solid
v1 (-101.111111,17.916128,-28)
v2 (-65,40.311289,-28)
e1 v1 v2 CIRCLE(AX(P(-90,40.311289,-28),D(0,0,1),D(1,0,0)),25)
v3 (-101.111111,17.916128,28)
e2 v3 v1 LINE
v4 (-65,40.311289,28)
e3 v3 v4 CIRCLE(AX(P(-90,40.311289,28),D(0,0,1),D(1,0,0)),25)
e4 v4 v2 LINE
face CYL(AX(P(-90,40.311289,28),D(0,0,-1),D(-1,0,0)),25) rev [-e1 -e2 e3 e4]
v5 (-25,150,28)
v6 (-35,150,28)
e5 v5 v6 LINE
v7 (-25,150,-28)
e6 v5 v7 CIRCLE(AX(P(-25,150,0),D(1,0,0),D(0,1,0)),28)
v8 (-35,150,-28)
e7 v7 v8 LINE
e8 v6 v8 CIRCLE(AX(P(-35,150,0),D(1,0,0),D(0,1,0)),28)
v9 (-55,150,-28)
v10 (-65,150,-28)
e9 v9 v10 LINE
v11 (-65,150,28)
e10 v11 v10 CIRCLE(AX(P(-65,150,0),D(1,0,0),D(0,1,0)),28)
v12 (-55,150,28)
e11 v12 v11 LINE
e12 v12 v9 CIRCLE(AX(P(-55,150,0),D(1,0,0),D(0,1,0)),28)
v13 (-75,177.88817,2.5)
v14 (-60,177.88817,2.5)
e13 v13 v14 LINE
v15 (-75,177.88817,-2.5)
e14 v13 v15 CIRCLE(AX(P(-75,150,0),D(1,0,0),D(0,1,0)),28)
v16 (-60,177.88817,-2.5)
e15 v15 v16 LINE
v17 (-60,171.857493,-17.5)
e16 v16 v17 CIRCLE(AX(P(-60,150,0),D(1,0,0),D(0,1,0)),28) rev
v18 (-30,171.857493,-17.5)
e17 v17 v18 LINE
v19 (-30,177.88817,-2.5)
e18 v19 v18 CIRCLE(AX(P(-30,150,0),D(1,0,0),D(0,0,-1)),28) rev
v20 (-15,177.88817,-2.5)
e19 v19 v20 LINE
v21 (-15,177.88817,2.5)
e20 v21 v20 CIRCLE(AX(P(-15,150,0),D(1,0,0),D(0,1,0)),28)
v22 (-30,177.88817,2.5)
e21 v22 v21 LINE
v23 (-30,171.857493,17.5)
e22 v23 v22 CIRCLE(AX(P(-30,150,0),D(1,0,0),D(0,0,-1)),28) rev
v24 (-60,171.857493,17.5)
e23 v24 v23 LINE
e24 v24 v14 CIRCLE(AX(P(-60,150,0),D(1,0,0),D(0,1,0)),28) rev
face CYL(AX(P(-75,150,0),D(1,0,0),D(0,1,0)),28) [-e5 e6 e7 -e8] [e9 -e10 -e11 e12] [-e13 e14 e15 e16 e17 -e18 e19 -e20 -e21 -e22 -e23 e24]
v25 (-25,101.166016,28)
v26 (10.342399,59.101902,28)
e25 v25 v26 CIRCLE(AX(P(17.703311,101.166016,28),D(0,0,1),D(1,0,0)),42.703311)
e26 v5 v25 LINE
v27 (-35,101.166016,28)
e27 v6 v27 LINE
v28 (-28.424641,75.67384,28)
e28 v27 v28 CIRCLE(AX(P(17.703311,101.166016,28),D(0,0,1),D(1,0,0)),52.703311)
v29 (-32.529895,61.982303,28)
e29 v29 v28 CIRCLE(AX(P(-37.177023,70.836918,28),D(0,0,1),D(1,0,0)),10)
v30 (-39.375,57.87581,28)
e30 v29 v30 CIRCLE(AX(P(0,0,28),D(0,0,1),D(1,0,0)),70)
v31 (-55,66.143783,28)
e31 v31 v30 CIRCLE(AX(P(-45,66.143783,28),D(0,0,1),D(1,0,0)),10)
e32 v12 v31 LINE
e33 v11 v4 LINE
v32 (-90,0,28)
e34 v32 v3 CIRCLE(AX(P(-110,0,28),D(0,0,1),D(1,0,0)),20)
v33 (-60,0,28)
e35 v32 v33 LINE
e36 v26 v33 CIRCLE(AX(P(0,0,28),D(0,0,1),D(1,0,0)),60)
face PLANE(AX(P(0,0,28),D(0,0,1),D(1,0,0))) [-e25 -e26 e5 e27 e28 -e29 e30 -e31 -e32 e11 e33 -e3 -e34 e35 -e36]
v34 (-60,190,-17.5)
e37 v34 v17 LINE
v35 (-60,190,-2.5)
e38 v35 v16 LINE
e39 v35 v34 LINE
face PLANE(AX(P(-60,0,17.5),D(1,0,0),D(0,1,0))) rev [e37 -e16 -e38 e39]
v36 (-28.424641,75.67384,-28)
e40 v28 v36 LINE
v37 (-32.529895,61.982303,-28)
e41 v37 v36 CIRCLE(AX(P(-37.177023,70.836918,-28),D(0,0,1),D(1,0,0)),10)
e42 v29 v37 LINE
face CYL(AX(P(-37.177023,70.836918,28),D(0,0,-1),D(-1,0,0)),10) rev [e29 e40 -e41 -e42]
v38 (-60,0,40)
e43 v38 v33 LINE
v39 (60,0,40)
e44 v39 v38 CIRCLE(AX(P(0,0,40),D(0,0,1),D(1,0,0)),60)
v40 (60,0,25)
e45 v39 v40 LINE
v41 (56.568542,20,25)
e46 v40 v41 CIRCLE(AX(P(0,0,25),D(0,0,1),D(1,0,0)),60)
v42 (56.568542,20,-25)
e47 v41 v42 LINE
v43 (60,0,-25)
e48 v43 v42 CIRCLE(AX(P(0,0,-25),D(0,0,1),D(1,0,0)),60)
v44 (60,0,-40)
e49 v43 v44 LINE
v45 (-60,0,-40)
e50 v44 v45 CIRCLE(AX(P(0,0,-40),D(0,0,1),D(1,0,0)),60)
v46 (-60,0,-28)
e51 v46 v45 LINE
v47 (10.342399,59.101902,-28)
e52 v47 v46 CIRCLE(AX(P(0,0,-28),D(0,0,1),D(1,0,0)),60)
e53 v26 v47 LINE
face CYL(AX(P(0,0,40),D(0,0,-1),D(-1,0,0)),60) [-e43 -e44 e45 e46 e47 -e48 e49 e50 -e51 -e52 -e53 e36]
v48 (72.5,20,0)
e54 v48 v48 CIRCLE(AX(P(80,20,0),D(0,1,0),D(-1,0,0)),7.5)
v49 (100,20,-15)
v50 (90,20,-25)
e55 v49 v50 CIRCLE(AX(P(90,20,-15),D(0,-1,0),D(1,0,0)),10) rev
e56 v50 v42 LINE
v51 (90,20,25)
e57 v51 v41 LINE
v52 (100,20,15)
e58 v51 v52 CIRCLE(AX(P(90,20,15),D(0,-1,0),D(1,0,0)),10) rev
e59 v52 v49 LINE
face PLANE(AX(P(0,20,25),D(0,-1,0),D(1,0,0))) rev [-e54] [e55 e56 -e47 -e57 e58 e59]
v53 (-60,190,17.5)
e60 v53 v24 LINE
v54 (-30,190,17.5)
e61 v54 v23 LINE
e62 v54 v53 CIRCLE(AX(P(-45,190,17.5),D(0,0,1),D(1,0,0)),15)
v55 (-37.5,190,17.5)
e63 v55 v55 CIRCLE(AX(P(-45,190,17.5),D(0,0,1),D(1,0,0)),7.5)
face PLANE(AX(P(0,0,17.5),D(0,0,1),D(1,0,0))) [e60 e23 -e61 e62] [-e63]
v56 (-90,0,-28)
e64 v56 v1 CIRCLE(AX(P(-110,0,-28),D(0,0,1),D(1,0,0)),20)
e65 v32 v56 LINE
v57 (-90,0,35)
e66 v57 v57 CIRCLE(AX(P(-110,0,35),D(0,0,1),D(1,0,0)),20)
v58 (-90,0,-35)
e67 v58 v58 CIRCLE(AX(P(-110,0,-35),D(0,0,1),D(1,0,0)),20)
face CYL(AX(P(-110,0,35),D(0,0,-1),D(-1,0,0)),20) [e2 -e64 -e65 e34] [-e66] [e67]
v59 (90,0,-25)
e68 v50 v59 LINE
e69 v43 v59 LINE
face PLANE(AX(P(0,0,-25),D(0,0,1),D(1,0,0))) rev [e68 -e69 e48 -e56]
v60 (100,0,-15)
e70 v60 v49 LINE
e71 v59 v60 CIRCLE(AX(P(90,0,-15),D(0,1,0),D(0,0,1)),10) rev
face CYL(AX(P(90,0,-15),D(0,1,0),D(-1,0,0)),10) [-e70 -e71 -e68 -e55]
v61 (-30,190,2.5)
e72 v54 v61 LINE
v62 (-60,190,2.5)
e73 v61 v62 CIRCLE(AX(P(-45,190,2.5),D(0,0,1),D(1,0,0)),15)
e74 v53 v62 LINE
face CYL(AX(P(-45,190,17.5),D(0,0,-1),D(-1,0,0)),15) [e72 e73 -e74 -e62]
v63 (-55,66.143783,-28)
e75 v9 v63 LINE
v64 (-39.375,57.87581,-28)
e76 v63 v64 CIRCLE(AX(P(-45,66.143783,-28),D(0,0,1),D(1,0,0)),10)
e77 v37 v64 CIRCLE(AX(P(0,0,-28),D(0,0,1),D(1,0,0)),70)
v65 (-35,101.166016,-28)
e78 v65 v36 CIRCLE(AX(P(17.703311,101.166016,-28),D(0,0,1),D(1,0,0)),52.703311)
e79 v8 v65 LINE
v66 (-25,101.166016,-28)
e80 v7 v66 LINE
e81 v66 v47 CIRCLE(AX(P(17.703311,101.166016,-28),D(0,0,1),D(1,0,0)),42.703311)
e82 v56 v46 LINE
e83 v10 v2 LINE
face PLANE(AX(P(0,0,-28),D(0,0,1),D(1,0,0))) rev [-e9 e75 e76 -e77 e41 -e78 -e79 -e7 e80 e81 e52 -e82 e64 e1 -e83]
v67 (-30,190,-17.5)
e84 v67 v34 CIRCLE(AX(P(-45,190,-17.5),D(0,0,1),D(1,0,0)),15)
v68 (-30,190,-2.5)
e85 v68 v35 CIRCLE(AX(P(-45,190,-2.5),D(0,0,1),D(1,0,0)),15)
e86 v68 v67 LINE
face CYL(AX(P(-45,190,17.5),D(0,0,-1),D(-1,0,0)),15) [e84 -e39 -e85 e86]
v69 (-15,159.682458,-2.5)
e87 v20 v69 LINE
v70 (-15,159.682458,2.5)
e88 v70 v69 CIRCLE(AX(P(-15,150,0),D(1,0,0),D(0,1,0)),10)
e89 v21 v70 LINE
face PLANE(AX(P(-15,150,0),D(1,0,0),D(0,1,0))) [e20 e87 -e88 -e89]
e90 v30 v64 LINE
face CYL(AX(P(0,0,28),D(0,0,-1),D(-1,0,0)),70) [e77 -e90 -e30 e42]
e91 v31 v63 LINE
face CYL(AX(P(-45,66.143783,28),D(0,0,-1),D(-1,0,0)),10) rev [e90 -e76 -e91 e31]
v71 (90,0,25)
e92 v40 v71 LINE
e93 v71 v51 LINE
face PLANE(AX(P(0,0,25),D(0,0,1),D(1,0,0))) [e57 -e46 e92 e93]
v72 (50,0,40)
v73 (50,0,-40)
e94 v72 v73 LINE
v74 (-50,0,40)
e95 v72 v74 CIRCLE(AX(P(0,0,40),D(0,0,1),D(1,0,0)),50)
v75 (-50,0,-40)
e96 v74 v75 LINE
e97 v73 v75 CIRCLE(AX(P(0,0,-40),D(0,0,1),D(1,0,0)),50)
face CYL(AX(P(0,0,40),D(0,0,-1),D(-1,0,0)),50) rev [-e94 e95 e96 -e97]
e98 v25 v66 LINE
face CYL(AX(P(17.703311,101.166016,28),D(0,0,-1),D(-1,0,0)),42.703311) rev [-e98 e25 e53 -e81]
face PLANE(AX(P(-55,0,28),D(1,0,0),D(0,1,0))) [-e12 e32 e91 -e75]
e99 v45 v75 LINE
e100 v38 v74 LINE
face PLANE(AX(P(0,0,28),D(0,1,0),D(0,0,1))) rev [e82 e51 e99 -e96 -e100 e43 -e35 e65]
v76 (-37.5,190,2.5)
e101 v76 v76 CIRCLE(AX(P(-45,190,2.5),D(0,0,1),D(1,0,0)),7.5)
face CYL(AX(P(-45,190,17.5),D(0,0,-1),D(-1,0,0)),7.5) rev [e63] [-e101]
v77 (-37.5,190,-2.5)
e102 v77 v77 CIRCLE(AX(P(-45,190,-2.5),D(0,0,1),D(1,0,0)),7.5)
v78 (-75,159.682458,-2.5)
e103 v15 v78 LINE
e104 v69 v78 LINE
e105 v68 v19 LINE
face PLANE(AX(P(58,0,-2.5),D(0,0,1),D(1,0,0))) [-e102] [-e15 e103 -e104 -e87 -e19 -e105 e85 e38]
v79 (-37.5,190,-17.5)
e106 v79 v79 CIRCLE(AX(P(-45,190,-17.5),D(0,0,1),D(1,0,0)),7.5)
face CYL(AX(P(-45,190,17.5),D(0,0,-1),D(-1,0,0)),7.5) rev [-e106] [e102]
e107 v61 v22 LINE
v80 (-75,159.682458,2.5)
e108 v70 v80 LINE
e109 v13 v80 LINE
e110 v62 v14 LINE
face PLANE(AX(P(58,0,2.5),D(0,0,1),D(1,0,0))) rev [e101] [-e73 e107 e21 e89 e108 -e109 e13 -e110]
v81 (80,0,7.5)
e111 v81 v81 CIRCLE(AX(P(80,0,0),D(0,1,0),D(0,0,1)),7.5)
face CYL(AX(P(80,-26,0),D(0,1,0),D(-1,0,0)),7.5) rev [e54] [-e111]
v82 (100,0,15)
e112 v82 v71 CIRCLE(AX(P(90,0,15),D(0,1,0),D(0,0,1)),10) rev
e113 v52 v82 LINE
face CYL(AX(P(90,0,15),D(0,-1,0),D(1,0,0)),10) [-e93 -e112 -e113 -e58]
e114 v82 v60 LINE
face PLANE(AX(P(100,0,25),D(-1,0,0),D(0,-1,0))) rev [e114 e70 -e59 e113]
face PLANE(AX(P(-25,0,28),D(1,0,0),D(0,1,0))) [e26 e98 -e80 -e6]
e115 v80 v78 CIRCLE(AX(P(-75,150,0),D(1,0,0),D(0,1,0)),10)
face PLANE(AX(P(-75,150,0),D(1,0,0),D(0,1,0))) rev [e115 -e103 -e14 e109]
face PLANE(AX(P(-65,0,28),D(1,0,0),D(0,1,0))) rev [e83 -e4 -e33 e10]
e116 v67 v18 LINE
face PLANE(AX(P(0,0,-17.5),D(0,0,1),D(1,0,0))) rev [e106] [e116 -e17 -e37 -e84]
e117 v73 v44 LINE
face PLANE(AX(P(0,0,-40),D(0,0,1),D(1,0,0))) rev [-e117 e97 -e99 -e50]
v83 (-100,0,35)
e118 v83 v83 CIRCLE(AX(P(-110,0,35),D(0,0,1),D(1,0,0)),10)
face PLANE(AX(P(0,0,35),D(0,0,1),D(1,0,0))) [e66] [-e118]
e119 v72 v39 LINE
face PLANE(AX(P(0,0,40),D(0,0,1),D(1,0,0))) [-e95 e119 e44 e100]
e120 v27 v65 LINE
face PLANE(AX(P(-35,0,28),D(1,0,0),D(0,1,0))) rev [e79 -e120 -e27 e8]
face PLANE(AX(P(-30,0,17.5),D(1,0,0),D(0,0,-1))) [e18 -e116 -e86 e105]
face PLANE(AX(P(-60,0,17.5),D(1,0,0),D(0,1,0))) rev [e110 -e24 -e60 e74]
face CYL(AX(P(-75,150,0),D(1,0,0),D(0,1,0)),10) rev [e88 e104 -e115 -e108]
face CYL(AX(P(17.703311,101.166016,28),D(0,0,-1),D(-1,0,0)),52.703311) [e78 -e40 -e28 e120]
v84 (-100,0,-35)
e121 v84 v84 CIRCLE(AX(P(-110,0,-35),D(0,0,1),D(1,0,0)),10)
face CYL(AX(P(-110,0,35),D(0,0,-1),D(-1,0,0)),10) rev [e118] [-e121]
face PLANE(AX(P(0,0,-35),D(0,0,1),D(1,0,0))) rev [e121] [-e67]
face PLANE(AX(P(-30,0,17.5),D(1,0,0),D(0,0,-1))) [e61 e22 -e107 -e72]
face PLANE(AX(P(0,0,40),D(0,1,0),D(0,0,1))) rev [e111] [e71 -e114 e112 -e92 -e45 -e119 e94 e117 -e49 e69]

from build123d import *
from build123d.topology import SkipClean

# Parameters (mm, degrees)
BOSS_EXTRUDE1_START       = -35
BOSS_EXTRUDE1_OUTLINE_R   = 20
BOSS_EXTRUDE1_OUTLINE_R_2 = 10
BOSS_EXTRUDE1_DEPTH       = 70
BOSS_EXTRUDE2_DEPTH       = 40
SKETCH1_7_W               = 20
SKETCH1_7_H               = 20
BOSS_EXTRUDE3_DEPTH       = 25
BOSS_EXTRUDE4_DEPTH       = 28
SKETCH4_R                 = 28
SKETCH4_R_2               = 10
BOSS_EXTRUDE5_DEPTH       = 60
BOSS_EXTRUDE7_START       = -17.5
BOSS_EXTRUDE7_OUTLINE_R   = 7.5
BOSS_EXTRUDE7_DEPTH       = 35
BOSS_EXTRUDE6_DEPTH       = 28
CUT_EXTRUDE3_DEPTH        = 83
CUT_EXTRUDE3_DEPTH_BACK   = 100
SKETCH8_R                 = 7.5
CUT_EXTRUDE4_DEPTH        = 46
FILLET1_R                 = 10


# Read off the part's stored shape, not the designer's step: Boss-Extrude1, Boss-Extrude7
with BuildPart() as part:
    # Boss-Extrude1 outline → Boss-Extrude1 (new body)
    with BuildSketch(Plane.XY.offset(BOSS_EXTRUDE1_START)):
        with Locations((-110, 0)):
            Circle(BOSS_EXTRUDE1_OUTLINE_R)
        with Locations((-110, 0)):
            Circle(BOSS_EXTRUDE1_OUTLINE_R_2, mode=Mode.SUBTRACT)
    extrude(amount=BOSS_EXTRUDE1_DEPTH)



with BuildPart() as body_2:
    # Sketch1<6> → Boss-Extrude2 (new, symmetric)
    with BuildSketch(Plane.XY):
        with BuildLine():
            ThreePointArc((-50, 0), (0, 50), (50, 0))
            Line((50, 0), (60, 0))
            ThreePointArc((60, 0), (59.135913579, 10.146118724), (56.568542495, 20))
            ThreePointArc((56.568542495, 20), (38.749299446, 45.8092981), (10.342399193, 59.101901652))
            ThreePointArc((10.342399193, 59.101901652), (-38.596995015, 45.937696675), (-60, 0))
            Line((-60, 0), (-50, 0))
        make_face()
    extrude(amount=BOSS_EXTRUDE2_DEPTH, both=True)

    # Sketch1<7> → Boss-Extrude3 (add, symmetric)
    with BuildSketch(Plane.XY):
        with BuildLine():
            ThreePointArc((56.568542495, 20), (59.135913579, 10.146118724), (60, 0))
            Line((60, 0), (80, 0))
            Line((80, 0), (80, 20))
            Line((80, 20), (56.568542495, 20))
        make_face()
        with Locations((90, 10)):
            Rectangle(SKETCH1_7_W, SKETCH1_7_H)
    extrude(amount=BOSS_EXTRUDE3_DEPTH, both=True)


with BuildPart() as part_1:
    add(part.part)

    add(body_2.part)  # Boss-Extrude4 merges body 2
    # Sketch1<10> → Boss-Extrude4 (add, symmetric)
    with BuildSketch(Plane.XY):
        with BuildLine():
            Line((-90, 0), (-70, 0))
            ThreePointArc((-70, 0), (-68.738635424, 13.228756555), (-65, 25.980762114))
            Line((-65, 25.980762114), (-65, 40.311288741))
            ThreePointArc((-65, 40.311288741), (-76.823843083, 19.065374102), (-101.111111111, 17.91612833))
            ThreePointArc((-101.111111111, 17.91612833), (-93.003268288, 10.540925534), (-90, 0))
        make_face()
        with BuildLine():
            Line((-70, 0), (-60, 0))
            ThreePointArc((-60, 0), (-38.596995015, 45.937696675), (10.342399193, 59.101901652))
            ThreePointArc((10.342399193, 59.101901652), (-0.830275834, 62.694222351), (-10.603119378, 69.192296244))
            ThreePointArc((-10.603119378, 69.192296244), (-21.865731835, 66.497291458), (-32.529894875, 61.982303438))
            ThreePointArc((-32.529894875, 61.982303438), (-36.01103024, 60.026708231), (-39.375, 57.87580993))
            ThreePointArc((-39.375, 57.87580993), (-54.569759712, 43.842232208), (-65, 25.980762114))
            ThreePointArc((-65, 25.980762114), (-68.738635424, 13.228756555), (-70, 0))
        make_face()
        with BuildLine():
            Line((-65, 40.311288741), (-65, 25.980762114))
            ThreePointArc((-65, 25.980762114), (-54.569759712, 43.842232208), (-39.375, 57.87580993))
            ThreePointArc((-39.375, 57.87580993), (-49.677071733, 57.304948012), (-55, 66.143782777))
            Line((-55, 66.143782777), (-55, 136))
            Line((-55, 136), (-65, 136))
            Line((-65, 136), (-65, 40.311288741))
        make_face()
        with BuildLine():
            ThreePointArc((-32.529894875, 61.982303438), (-21.865731835, 66.497291458), (-10.603119378, 69.192296244))
            ThreePointArc((-10.603119378, 69.192296244), (-21.234787758, 83.633268621), (-25, 101.166016053))
            Line((-25, 101.166016053), (-25, 136))
            Line((-25, 136), (-35, 136))
            Line((-35, 136), (-35, 101.166016053))
            ThreePointArc((-35, 101.166016053), (-33.329691901, 88.00274883), (-28.424640616, 75.67383951))
            ThreePointArc((-28.424640616, 75.67383951), (-27.598335088, 67.964855653), (-32.529894875, 61.982303438))
        make_face()
    extrude(amount=BOSS_EXTRUDE4_DEPTH, both=True)



with BuildPart() as body_2_2:
    # Sketch4 → Boss-Extrude5 (new body)
    with BuildSketch(Plane(origin=(-15, 0, 0), x_dir=(0, 0, -1), z_dir=(1, 0, 0))):
        with Locations(Location((0, 150, 0), (0, 0, 90))):
            Circle(SKETCH4_R)
        with Locations(Location((0, 150, 0), (0, 0, 90))):
            Circle(SKETCH4_R_2, mode=Mode.SUBTRACT)
    extrude(amount=-BOSS_EXTRUDE5_DEPTH)

    # Boss-Extrude7 outline → Boss-Extrude7 (add)
    with BuildSketch(Plane.XY.offset(BOSS_EXTRUDE7_START)):
        with BuildLine():
            Line((-30, 150), (-30, 190))
            ThreePointArc((-30, 190), (-45, 205), (-60, 190))
            Line((-60, 190), (-60, 150))
            Line((-60, 150), (-30, 150))
        make_face()
        with Locations((-45, 190)):
            Circle(BOSS_EXTRUDE7_OUTLINE_R, mode=Mode.SUBTRACT)
    extrude(amount=BOSS_EXTRUDE7_DEPTH)


with BuildPart() as part_2:
    add(part_1.part)

    add(body_2_2.part)  # Boss-Extrude6 merges body 2 2
    # Sketch1<11> → Boss-Extrude6 (add, symmetric)
    with BuildSketch(Plane.XY):
        Polygon((-35, 136), (-25, 136), (-25, 150), (-30, 150), (-35, 150), align=None)
        Polygon((-65, 150), (-65, 136), (-55, 136), (-55, 150), (-60, 150), align=None)
    extrude(amount=BOSS_EXTRUDE6_DEPTH, both=True)

    # Sketch7 → Cut-Extrude3 (cut, two sides: drawn at the far end of the back side and taken through both)
    with SkipClean():  # the faces are left unmerged after this step: merging them gives an invalid solid
        with BuildSketch(Plane(origin=(-25, 0, 0), x_dir=(0, 0, -1), z_dir=(1, 0, 0)).offset(-CUT_EXTRUDE3_DEPTH_BACK)):
            with BuildLine():
                ThreePointArc((2.5, 159.682458366), (1.260042925, 159.920296963), (0, 160))
                ThreePointArc((0, 160), (-1.260042925, 159.920296963), (-2.5, 159.682458366))
                ThreePointArc((-2.5, 159.682458366), (-7.90569415, 156.123724357), (-10, 150))
                Line((-10, 150), (10, 150))
                ThreePointArc((10, 150), (7.90569415, 156.123724357), (2.5, 159.682458366))
            make_face()
            with BuildLine():
                ThreePointArc((-10, 150), (0, 140), (10, 150))
                Line((10, 150), (-10, 150))
            make_face()
            with BuildLine():
                Line((0, 205), (0, 160))
                ThreePointArc((0, 160), (1.260042925, 159.920296963), (2.5, 159.682458366))
                Line((2.5, 159.682458366), (2.5, 205))
                Line((2.5, 205), (0, 205))
            make_face()
            with BuildLine():
                ThreePointArc((-2.5, 159.682458366), (-1.260042925, 159.920296963), (0, 160))
                Line((0, 160), (0, 205))
                Line((0, 205), (-2.5, 205))
                Line((-2.5, 205), (-2.5, 159.682458366))
            make_face()
        extrude(amount=CUT_EXTRUDE3_DEPTH + CUT_EXTRUDE3_DEPTH_BACK, mode=Mode.SUBTRACT)

    # Sketch8 → Cut-Extrude4 (cut)
    with SkipClean():  # the faces are left unmerged after this step: merging them gives an invalid solid
        with BuildSketch(Plane(origin=(0, 20, 0), x_dir=(1, 0, 0), z_dir=(0, 1, 0))):
            with Locations(Location((80, 0, 0), (0, 0, 180))):
                Circle(SKETCH8_R)
        extrude(amount=-CUT_EXTRUDE4_DEPTH, mode=Mode.SUBTRACT)

    # Fillet1
    fillet1_edges = [part_2.edges().sort_by_distance(p)[0] for p in [
        (100, 10, -25),
        (100, 10, 25),
    ]]
    fillet(fillet1_edges, radius=FILLET1_R)


solid = part_2.part
